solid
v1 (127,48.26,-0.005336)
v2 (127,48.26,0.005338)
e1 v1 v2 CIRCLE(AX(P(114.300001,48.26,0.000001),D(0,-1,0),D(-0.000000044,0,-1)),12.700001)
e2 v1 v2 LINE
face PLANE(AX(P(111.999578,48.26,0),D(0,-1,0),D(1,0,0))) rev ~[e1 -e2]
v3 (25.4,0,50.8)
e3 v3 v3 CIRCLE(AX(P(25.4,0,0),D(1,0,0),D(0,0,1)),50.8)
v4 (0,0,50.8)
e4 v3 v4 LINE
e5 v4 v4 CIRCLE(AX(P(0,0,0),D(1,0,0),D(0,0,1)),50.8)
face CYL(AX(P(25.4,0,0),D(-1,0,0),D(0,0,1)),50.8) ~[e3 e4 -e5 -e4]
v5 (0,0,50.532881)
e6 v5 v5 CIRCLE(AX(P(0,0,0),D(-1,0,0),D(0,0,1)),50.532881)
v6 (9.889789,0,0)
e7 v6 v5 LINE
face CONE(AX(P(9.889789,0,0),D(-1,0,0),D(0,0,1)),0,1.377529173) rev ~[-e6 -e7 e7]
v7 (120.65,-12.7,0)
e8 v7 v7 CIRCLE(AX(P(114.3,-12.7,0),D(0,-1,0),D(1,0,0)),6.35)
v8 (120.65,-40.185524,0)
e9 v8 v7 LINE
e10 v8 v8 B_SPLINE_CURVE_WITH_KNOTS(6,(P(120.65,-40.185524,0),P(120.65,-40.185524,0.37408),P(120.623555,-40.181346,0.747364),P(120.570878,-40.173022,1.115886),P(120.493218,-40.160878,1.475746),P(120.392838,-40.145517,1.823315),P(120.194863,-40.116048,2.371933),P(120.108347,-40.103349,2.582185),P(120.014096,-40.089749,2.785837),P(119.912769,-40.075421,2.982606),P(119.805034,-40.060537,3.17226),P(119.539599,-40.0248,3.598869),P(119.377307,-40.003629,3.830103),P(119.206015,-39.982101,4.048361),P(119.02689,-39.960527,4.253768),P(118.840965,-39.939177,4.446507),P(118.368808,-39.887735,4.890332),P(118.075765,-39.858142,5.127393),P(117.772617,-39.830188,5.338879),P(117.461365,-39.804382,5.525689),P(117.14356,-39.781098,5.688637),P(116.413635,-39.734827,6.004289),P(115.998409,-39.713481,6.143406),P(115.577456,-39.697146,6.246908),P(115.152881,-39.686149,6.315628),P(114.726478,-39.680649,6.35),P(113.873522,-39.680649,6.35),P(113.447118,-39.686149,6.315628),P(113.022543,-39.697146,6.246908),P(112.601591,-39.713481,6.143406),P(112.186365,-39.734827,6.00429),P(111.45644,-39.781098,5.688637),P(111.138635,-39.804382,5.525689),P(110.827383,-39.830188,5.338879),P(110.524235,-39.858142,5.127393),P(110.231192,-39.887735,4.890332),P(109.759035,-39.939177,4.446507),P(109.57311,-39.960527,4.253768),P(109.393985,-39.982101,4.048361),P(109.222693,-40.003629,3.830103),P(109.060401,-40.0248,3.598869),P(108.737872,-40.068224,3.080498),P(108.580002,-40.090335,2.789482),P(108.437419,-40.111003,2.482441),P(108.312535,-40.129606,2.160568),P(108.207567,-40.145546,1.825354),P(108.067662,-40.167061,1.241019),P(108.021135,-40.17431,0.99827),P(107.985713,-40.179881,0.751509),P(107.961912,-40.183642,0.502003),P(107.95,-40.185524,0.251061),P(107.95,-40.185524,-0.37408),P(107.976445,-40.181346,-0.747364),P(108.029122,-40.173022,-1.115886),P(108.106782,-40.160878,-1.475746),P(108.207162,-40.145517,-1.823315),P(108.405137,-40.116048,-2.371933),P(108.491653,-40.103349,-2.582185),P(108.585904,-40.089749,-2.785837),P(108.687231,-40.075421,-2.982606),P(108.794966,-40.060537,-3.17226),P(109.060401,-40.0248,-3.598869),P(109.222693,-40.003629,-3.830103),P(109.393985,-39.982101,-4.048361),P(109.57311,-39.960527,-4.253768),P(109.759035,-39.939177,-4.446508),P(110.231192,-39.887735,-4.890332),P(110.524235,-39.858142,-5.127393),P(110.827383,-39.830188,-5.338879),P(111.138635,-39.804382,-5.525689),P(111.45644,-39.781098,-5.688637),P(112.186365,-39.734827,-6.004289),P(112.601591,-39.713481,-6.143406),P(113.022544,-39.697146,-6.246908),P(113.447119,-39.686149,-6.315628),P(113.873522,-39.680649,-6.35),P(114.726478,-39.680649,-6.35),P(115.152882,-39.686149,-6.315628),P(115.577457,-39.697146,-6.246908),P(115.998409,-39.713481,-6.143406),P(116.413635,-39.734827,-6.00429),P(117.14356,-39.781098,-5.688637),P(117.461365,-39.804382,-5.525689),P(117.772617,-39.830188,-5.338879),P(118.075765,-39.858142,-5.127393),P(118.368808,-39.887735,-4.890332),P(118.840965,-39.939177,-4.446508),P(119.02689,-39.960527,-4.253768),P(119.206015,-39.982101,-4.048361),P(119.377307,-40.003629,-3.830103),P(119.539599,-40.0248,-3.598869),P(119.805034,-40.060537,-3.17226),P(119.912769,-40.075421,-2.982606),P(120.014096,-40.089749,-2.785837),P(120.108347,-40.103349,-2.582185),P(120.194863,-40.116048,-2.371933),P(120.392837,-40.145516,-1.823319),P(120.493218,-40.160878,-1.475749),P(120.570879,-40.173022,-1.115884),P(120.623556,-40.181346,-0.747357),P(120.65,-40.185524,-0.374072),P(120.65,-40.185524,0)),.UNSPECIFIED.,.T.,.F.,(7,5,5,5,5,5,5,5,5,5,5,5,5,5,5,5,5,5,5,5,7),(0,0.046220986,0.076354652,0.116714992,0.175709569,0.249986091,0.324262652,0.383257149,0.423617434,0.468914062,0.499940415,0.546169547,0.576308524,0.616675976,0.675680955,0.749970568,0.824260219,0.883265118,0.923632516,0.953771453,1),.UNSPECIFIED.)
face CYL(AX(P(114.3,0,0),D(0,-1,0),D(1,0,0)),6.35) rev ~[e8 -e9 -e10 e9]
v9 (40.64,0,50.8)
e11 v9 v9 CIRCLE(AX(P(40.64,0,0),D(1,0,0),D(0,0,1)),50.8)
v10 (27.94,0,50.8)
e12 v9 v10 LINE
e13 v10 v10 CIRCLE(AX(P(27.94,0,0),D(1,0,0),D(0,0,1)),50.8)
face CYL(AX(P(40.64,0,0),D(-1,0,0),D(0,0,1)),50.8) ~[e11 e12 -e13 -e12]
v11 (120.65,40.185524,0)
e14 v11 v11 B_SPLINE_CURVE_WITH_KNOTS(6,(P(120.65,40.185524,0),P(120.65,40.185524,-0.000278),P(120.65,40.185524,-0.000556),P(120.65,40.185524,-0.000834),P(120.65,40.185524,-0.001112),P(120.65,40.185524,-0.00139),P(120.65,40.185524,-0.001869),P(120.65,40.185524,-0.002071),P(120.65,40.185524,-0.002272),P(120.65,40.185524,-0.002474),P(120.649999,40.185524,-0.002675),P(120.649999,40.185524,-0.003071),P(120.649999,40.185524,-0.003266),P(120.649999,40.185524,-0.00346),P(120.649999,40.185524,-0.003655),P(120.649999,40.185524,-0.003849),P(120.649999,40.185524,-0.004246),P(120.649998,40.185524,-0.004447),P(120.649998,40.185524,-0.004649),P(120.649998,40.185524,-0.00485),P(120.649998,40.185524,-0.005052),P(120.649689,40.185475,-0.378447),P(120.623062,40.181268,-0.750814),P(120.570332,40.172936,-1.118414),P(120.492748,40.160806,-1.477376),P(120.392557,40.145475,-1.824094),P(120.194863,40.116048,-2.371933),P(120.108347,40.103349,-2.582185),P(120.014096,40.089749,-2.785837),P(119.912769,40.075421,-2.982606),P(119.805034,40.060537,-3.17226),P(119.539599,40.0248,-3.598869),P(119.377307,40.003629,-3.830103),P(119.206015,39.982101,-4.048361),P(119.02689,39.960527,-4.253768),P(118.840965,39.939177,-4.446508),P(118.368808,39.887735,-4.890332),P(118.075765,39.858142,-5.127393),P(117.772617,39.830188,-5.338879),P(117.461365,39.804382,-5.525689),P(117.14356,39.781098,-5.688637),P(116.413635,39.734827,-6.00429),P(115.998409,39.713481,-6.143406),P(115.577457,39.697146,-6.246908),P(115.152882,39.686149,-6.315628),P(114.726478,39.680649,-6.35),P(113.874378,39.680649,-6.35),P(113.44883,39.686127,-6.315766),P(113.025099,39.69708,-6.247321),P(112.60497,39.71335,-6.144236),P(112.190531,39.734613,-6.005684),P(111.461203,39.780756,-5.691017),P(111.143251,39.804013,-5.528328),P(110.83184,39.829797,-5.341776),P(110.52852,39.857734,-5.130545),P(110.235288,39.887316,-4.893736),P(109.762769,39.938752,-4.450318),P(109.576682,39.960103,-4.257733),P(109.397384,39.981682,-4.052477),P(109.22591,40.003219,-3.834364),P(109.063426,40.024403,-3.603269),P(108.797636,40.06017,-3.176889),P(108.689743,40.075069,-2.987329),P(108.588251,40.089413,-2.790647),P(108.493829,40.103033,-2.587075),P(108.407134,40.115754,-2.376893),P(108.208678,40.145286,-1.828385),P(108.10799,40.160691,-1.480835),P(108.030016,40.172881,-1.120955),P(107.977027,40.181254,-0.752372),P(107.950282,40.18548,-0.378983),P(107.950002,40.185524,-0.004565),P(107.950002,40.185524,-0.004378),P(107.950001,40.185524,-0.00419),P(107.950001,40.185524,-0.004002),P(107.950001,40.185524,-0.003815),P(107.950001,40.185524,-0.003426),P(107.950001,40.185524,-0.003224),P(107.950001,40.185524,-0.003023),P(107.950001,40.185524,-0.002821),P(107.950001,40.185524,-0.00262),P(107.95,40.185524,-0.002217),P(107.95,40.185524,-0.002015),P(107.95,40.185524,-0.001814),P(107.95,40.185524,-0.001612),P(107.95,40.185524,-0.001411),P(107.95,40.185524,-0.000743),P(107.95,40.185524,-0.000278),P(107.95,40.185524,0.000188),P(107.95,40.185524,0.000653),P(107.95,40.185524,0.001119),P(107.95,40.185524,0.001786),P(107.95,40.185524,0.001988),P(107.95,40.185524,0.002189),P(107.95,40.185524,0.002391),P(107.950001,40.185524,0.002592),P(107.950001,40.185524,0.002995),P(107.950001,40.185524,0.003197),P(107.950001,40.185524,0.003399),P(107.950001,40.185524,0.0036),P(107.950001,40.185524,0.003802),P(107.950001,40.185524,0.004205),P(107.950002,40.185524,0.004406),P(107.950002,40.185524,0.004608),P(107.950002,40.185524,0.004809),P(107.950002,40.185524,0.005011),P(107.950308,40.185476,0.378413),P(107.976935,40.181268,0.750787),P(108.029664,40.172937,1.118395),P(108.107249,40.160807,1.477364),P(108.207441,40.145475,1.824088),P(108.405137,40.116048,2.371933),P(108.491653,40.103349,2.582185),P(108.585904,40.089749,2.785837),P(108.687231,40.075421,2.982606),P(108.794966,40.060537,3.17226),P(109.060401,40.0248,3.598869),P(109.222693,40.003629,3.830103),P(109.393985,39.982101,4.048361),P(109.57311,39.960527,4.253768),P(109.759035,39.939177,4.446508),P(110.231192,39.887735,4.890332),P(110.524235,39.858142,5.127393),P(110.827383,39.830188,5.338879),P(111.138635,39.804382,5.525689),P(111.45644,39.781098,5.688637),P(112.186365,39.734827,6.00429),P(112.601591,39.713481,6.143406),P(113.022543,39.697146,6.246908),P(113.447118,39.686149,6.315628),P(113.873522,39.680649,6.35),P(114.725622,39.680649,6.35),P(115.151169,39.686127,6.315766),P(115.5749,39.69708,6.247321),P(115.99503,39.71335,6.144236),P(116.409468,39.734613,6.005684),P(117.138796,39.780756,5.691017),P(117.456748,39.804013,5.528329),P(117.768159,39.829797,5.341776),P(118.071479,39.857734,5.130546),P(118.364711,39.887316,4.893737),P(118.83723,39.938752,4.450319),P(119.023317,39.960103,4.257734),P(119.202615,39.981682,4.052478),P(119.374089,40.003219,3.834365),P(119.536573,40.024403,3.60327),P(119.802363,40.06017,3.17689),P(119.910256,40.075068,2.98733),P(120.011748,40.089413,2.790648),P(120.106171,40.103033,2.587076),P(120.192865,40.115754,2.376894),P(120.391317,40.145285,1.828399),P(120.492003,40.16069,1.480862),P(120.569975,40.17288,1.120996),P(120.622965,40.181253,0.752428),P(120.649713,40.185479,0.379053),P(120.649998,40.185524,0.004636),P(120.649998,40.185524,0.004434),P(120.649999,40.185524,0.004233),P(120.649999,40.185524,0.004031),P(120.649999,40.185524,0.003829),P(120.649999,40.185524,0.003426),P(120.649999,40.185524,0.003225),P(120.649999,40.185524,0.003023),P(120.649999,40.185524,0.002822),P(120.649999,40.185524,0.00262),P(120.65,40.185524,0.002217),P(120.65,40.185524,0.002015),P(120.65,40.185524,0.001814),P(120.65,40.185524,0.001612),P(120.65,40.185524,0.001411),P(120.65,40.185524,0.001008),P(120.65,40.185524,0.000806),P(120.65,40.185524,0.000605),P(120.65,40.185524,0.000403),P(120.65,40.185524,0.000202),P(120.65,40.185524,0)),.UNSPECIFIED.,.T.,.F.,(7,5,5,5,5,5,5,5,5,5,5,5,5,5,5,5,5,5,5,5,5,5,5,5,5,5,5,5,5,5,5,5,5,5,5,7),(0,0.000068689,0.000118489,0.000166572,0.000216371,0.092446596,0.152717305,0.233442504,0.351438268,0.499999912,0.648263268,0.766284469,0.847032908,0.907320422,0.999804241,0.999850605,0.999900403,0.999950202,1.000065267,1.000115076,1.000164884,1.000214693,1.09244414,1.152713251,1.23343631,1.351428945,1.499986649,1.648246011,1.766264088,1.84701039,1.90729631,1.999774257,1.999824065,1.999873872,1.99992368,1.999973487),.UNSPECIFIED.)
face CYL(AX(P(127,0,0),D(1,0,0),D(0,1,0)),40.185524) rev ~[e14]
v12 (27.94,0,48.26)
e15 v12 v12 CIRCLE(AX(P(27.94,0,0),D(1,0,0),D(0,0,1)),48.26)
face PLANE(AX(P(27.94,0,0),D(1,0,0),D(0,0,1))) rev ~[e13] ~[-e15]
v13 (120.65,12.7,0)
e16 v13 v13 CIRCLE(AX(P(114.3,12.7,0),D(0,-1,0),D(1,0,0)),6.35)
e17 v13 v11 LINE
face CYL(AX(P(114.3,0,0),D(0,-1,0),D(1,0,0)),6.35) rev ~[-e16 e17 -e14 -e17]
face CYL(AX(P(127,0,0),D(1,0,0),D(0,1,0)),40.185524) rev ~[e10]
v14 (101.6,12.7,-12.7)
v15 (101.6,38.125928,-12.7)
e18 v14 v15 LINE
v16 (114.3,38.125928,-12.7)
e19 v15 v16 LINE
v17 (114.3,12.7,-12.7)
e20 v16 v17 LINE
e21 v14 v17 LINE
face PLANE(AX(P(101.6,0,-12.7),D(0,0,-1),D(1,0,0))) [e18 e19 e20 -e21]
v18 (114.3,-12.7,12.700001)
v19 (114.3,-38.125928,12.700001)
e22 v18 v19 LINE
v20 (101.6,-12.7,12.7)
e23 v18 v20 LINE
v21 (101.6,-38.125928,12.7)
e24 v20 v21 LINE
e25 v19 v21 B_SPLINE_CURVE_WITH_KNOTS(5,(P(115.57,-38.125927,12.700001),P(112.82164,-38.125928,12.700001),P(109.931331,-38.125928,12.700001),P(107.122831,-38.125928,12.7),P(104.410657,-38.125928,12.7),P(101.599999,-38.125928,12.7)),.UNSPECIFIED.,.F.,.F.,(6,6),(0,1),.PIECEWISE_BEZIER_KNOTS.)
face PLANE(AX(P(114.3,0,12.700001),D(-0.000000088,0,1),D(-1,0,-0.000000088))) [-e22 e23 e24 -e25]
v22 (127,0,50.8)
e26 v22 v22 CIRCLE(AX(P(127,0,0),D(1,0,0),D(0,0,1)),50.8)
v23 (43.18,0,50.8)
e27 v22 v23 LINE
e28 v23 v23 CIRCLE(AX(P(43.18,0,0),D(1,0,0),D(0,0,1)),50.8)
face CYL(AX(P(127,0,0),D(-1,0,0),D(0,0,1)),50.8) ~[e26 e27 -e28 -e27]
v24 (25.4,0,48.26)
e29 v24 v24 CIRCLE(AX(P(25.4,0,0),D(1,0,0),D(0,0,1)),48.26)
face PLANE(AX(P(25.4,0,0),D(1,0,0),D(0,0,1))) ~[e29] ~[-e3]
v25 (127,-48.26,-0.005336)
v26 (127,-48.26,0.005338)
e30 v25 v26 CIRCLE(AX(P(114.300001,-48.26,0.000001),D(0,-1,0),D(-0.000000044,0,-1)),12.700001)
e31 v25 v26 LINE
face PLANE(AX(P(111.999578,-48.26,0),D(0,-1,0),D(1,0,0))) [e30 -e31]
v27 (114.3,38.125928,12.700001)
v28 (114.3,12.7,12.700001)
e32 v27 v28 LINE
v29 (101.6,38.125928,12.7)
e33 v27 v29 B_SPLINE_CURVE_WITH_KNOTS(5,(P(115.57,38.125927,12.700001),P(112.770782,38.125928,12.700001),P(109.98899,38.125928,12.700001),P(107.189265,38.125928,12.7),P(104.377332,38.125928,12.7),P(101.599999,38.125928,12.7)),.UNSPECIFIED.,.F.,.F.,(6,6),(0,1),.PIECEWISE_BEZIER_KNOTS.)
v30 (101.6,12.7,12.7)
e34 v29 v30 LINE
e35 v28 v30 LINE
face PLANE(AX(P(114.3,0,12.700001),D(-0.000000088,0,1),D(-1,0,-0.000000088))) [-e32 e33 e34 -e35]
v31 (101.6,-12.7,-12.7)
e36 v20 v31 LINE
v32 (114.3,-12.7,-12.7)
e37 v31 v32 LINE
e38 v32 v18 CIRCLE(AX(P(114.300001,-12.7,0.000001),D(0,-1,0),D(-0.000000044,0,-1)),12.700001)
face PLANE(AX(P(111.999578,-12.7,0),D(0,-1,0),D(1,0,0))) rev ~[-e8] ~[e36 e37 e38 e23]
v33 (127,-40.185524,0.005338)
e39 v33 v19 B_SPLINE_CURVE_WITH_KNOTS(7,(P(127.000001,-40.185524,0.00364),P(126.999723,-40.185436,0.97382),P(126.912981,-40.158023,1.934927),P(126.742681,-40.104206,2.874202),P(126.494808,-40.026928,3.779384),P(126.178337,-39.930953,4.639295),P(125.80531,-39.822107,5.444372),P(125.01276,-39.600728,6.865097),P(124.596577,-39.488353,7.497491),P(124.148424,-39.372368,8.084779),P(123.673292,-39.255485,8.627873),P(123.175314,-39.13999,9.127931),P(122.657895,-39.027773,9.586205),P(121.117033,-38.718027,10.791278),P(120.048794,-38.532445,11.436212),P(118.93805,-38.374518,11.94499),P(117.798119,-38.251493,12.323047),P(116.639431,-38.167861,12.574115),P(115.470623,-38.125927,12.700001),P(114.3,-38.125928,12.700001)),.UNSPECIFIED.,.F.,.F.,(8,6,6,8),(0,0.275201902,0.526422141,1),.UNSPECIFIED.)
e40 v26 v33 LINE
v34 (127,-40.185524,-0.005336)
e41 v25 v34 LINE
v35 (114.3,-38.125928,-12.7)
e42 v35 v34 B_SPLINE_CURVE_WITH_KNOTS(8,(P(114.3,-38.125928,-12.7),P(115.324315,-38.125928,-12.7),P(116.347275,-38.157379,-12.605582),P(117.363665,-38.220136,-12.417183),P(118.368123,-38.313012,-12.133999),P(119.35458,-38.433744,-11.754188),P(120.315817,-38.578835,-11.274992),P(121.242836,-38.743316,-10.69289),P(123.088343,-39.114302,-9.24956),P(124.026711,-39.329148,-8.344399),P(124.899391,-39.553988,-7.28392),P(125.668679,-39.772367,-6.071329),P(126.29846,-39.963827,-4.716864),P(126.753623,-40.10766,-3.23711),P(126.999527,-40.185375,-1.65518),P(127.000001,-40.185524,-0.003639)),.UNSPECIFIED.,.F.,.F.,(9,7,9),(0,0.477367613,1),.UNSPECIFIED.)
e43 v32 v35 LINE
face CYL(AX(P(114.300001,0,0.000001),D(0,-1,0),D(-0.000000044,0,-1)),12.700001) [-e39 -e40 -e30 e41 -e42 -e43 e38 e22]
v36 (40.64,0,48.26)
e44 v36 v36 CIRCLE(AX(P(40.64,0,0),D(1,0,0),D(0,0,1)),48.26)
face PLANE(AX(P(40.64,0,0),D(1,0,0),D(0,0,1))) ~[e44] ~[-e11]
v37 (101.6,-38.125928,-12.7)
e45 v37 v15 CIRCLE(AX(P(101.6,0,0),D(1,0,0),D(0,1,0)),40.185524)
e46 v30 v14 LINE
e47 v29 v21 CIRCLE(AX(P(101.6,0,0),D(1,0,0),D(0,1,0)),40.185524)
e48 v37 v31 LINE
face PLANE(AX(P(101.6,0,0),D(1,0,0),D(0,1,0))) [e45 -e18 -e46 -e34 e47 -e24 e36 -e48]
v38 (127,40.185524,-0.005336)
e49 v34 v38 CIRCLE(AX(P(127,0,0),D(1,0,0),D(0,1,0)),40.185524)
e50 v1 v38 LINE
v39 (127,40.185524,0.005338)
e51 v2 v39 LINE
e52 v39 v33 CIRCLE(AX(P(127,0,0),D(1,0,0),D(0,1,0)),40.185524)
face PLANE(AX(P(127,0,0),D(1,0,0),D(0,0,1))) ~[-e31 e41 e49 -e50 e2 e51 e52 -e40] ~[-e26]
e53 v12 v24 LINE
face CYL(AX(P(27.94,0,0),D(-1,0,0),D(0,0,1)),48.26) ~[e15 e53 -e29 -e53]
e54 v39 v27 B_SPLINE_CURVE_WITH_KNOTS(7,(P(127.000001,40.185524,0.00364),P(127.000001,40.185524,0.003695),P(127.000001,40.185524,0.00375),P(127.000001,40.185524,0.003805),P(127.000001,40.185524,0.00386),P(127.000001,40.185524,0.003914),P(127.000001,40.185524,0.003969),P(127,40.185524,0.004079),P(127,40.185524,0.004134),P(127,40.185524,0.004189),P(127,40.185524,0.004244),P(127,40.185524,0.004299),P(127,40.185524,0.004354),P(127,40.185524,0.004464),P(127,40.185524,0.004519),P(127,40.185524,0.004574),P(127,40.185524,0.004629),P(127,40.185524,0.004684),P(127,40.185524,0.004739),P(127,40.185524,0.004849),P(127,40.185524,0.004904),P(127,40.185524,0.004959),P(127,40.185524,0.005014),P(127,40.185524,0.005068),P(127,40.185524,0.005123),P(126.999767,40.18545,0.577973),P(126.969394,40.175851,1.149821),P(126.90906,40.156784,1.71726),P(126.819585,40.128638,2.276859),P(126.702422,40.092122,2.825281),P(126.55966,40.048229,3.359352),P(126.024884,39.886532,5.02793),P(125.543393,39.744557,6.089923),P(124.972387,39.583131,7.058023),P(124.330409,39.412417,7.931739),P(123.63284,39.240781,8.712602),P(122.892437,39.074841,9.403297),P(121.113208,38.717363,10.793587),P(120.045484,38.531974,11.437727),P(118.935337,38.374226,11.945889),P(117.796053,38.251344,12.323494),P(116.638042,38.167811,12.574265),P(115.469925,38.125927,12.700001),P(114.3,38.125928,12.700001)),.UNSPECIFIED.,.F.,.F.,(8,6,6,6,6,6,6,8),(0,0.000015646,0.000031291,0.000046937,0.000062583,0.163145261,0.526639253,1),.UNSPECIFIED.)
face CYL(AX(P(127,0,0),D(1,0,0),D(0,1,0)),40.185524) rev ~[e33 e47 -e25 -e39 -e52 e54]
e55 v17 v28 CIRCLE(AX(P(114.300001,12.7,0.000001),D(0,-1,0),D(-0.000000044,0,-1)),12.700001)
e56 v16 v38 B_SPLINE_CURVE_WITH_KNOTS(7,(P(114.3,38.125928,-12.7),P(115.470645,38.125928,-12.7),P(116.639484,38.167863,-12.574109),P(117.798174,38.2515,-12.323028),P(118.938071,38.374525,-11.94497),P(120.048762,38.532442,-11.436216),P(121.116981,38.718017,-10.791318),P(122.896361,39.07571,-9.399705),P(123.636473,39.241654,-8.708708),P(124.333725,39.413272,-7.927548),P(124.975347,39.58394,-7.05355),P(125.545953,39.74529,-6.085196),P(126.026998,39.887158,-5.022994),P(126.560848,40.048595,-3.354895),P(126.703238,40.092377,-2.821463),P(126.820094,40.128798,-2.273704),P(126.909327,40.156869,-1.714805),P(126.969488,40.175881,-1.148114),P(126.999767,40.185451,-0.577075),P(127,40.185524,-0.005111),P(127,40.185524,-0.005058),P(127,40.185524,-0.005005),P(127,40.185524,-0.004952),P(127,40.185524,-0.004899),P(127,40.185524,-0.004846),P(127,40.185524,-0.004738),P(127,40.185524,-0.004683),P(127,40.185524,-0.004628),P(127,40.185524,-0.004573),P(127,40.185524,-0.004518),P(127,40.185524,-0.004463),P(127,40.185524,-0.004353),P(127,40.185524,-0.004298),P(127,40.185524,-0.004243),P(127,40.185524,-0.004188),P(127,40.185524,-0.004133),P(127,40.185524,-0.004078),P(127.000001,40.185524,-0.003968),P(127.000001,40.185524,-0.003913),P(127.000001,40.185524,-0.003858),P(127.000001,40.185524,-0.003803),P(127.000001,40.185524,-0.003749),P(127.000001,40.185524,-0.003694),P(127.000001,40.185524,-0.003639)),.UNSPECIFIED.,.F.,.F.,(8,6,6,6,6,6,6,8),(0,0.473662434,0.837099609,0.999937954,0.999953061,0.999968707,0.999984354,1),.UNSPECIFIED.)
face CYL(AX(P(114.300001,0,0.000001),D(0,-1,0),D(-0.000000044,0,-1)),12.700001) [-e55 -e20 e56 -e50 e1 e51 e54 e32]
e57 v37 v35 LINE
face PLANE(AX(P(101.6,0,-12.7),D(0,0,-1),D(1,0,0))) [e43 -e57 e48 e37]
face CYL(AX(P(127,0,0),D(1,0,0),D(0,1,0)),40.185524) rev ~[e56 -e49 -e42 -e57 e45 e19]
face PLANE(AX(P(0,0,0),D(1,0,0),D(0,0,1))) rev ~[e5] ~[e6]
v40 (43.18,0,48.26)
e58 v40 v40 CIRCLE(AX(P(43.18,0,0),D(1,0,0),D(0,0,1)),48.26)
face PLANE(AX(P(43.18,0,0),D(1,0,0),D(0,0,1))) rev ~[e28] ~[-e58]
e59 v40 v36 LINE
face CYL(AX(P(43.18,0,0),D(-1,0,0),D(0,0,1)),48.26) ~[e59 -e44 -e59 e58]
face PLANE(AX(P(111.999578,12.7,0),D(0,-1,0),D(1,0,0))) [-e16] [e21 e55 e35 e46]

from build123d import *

# Parameters (mm, degrees)
F2_R          = 40.1855244707
F3_DEPTH      = 25.4
F4_R          = 6.35
F5_DEPTH      = 48.26
F5_DEPTH_BACK = 48.26
F6_DEPTH      = 12.7
F6_DEPTH_BACK = 12.7


# Not quite as in the source:
# - ends of sketch curves that miss each other by under 0.0002 mm in the source are joined


with BuildPart() as f1:
    # F0 (on Front) → F1 (revolve)
    with BuildSketch(Plane.XZ):
        Polygon((0, 50.8), (0, 0), (127, 0), (127, 50.8), (43.18, 50.8), (43.18, 48.26), (40.64, 48.26), (40.64, 50.8), (27.94, 50.8), (27.94, 48.26), (25.4, 48.26), (25.4, 50.8), align=None)
    revolve(axis=Axis((-13.3472196758, 0, 0), (1, 0, 0)))

    # F2 (on face) → F3 (cut)
    with BuildSketch(Plane.YZ.offset(127)):
        Circle(F2_R)
    extrude(amount=-F3_DEPTH, mode=Mode.SUBTRACT)

    # F4 (on Front) → F5 (join, two sides)
    with BuildSketch(Plane.XZ) as f5_sk:
        with BuildLine():
            Line((101.6, -12.7), (114.3, -12.7))
            ThreePointArc((114.3, -12.7), (127.0000011214, 0), (114.3, 12.7000011214))
            Line((114.3, 12.7000011214), (101.6, 12.7))
            Line((101.6, 12.7), (101.6, -12.7))
        make_face()
        with Locations((114.3, 0)):
            Circle(F4_R, mode=Mode.SUBTRACT)
    extrude(amount=F5_DEPTH)
    extrude(f5_sk.sketch, amount=-F5_DEPTH_BACK)

    # F4 (on Front) → F6 (cut, two sides)
    with BuildSketch(Plane.XZ) as f6_sk:
        with BuildLine():
            Line((101.6, -12.7), (114.3, -12.7))
            ThreePointArc((114.3, -12.7), (127.0000011214, 0), (114.3, 12.7000011214))
            Line((114.3, 12.7000011214), (101.6, 12.7))
            Line((101.6, 12.7), (101.6, -12.7))
        make_face()
        with Locations((114.3, 0)):
            Circle(F4_R, mode=Mode.SUBTRACT)
    extrude(amount=-F6_DEPTH, mode=Mode.SUBTRACT)
    extrude(f6_sk.sketch, amount=F6_DEPTH_BACK, mode=Mode.SUBTRACT)

    # F7 (on Front) → F8 (revolve, cut)
    with BuildSketch(Plane.XZ):
        Polygon((0, 50.5328811705), (0, 0), (9.8897889256, 0), align=None)
    revolve(axis=Axis((4.9448944628, 0, 0), (-1, 0, 0)), mode=Mode.SUBTRACT)


solid = f1.part
